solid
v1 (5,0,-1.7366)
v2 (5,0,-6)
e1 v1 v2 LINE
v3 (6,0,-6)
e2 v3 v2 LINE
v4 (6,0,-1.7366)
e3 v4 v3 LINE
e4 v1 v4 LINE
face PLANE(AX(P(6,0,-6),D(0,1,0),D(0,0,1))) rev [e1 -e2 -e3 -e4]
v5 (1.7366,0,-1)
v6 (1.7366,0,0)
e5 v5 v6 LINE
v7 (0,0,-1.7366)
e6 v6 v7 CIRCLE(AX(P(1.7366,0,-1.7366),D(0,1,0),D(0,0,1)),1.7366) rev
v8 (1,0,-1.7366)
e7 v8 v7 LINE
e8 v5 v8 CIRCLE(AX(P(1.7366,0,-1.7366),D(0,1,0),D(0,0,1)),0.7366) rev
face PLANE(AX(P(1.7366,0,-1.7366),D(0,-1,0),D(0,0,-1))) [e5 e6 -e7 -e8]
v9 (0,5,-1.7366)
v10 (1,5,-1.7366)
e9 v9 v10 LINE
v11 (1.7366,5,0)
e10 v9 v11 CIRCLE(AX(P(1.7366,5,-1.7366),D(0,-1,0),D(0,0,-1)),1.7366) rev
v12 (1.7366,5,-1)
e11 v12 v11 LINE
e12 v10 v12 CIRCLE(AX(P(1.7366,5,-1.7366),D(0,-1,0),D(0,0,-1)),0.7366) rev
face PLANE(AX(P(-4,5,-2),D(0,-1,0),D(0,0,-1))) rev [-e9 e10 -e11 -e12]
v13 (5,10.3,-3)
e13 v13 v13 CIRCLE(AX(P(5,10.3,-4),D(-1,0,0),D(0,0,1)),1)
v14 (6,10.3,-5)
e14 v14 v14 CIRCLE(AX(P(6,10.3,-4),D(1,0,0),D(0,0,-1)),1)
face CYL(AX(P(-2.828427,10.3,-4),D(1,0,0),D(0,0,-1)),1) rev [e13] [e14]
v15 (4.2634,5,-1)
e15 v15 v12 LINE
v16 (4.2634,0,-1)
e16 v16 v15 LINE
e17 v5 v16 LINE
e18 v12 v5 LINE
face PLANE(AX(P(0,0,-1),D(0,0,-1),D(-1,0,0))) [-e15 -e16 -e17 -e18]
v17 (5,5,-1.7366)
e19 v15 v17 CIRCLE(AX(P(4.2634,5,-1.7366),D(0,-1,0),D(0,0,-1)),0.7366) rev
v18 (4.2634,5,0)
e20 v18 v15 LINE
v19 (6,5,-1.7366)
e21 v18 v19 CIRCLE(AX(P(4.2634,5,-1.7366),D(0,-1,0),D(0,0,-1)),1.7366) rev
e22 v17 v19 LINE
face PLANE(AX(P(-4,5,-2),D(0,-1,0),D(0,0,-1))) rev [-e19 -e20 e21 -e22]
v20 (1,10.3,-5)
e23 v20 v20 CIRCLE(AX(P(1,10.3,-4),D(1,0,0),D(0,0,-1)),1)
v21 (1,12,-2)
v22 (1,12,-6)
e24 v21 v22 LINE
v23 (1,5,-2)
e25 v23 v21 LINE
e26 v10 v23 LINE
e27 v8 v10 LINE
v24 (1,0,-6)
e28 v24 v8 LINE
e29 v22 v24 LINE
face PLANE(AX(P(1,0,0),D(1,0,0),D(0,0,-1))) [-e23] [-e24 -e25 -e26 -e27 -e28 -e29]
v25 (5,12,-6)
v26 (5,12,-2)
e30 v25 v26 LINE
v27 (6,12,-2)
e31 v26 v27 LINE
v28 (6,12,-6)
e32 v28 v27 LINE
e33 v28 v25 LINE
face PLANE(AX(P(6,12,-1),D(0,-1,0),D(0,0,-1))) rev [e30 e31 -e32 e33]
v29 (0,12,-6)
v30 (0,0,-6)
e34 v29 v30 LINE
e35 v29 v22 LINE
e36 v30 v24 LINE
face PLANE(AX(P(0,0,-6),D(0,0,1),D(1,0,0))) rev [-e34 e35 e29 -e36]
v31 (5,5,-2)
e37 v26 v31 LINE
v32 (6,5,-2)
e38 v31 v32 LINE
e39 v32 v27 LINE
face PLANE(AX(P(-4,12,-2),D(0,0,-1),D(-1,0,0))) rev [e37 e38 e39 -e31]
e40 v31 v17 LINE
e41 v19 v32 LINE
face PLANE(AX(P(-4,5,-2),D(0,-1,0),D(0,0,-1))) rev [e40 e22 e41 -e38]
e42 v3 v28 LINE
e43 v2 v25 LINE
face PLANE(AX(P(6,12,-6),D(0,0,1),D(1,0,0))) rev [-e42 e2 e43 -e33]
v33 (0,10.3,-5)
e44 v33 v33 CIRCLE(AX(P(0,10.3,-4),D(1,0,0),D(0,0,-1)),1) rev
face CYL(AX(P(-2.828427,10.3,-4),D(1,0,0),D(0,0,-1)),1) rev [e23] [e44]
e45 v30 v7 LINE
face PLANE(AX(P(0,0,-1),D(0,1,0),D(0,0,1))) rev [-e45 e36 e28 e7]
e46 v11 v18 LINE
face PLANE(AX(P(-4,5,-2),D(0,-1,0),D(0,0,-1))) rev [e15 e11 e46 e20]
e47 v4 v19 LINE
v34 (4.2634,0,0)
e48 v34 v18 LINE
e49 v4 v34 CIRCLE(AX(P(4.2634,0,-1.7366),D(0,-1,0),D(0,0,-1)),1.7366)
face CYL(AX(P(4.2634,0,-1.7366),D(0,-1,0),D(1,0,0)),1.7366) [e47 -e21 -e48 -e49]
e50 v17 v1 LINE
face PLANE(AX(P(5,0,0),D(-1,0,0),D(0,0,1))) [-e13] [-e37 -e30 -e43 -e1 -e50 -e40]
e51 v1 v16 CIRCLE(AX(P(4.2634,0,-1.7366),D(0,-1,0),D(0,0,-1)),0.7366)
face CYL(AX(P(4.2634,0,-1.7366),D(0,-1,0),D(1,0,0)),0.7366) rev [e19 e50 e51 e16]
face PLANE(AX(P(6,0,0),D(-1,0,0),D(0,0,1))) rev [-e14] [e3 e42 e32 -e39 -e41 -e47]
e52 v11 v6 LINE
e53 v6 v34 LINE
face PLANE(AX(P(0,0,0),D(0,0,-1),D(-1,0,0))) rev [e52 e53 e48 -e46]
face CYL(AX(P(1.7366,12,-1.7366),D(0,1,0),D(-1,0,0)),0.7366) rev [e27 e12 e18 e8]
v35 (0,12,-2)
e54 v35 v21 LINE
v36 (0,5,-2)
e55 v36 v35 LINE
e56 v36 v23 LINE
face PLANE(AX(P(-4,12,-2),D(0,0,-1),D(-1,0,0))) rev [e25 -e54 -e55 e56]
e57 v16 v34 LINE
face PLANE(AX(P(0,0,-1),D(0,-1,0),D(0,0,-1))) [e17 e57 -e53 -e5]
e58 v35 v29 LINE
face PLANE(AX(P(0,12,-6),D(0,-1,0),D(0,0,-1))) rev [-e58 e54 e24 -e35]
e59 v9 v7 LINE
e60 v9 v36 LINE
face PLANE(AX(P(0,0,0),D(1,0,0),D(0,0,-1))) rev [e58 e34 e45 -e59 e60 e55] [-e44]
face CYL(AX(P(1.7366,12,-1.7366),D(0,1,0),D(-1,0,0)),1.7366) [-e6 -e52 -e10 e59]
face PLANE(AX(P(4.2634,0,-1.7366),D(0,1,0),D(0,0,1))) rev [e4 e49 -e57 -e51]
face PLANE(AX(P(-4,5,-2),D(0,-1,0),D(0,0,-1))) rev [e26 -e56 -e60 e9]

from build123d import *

# Parameters (mm, degrees)
CROQUIS2_W                         = 6
CROQUIS2_H                         = 12
BRIDA_BASE1_DEPTH                  = 1
BRIDA_DE_ARISTA1_STRIP_W           = 5.4732
BRIDA_DE_ARISTA1_STRIP_H           = 1
BRIDA_DE_ARISTA1_STRIP_CUT_DEPTH   = 12
BRIDA_DE_ARISTA1_STRIP_2_W         = 5.4732
BRIDA_DE_ARISTA1_STRIP_2_H         = 1
BRIDA_DE_ARISTA1_STRIP_CUT_2_DEPTH = 12
BRIDA_DE_ARISTA1_DEPTH             = 12
BRIDA_DE_ARISTA1_BEND_DEPTH        = 12
CROQUIS13_W                        = 2
CROQUIS13_H                        = 7
CORTAR_EXTRUIR1_DEPTH              = 10
CORTAR_EXTRUIR2_REACH              = 16.697
CROQUIS14_R                        = 1


# Sheet-metal steps are written as plain solids
with BuildPart() as part:
    # Croquis2 → Brida base1 (new body)
    with BuildSketch(Plane.XY):
        with Locations((3, 6)):
            Rectangle(CROQUIS2_W, CROQUIS2_H)
    extrude(amount=-BRIDA_BASE1_DEPTH)

    # Brida de arista1 strip (across the edge) → Brida de arista1 strip cut (cut)
    with BuildSketch(Plane(origin=(6, 12, -1), x_dir=(-1, 0, 0), z_dir=(0, -1, 0))):
        with Locations((-1, -0.5)):
            Rectangle(BRIDA_DE_ARISTA1_STRIP_W, BRIDA_DE_ARISTA1_STRIP_H)
    extrude(amount=BRIDA_DE_ARISTA1_STRIP_CUT_DEPTH, mode=Mode.SUBTRACT)

    # Brida de arista1 strip 2 (across the edge) → Brida de arista1 strip cut 2 (cut)
    with BuildSketch(Plane(origin=(0, 0, -1), x_dir=(1, 0, 0), z_dir=(0, 1, 0))):
        with Locations((-1, -0.5)):
            Rectangle(BRIDA_DE_ARISTA1_STRIP_2_W, BRIDA_DE_ARISTA1_STRIP_2_H)
    extrude(amount=BRIDA_DE_ARISTA1_STRIP_CUT_2_DEPTH, mode=Mode.SUBTRACT)

    # Brida de arista1 section (across the edge) → Brida de arista1 (add)
    with BuildSketch(Plane(origin=(6, 12, -1), x_dir=(-1, 0, 0), z_dir=(0, -1, 0))):
        with BuildLine():
            Line((0, 0.7366), (0, 5))
            Line((0, 5), (1, 5))
            Line((1, 5), (1, 0.7366))
            ThreePointArc((1, 0.7366), (1.215745145, 0.215745145), (1.7366, 0))
            Line((1.7366, 0), (1.7366, -1))
            ThreePointArc((1.7366, -1), (0.508638364, -0.491361636), (0, 0.7366))
        make_face()
    extrude(amount=BRIDA_DE_ARISTA1_DEPTH)

    # Brida de arista1 section 2 (across the edge) → Brida de arista1 bend (add)
    with BuildSketch(Plane(origin=(0, 0, -1), x_dir=(1, 0, 0), z_dir=(0, 1, 0))):
        with BuildLine():
            Line((0, 0.7366), (0, 5))
            Line((0, 5), (1, 5))
            Line((1, 5), (1, 0.7366))
            ThreePointArc((1, 0.7366), (1.215745145, 0.215745145), (1.7366, 0))
            Line((1.7366, 0), (1.7366, -1))
            ThreePointArc((1.7366, -1), (0.508638364, -0.491361636), (0, 0.7366))
        make_face()
    extrude(amount=BRIDA_DE_ARISTA1_BEND_DEPTH)

    # Croquis13 → Cortar-Extruir1 (cut)
    with BuildSketch(Plane(origin=(6, 0, 0), x_dir=(0, 0, -1), z_dir=(1, 0, 0))):
        with Locations((1, 8.5)):
            Rectangle(CROQUIS13_W, CROQUIS13_H)
    extrude(amount=-CORTAR_EXTRUIR1_DEPTH, mode=Mode.SUBTRACT)

    # Cortar-Extruir2: up to this face of the body (flat: up to its plane)
    cortar_extruir2_end = Plane(part.part.faces().sort_by_distance((0, 5.906533244, -3.943073405))[0])
    # Croquis14 → Cortar-Extruir2 (cut, up to the picked face)
    with BuildSketch(Plane(origin=(6, 0, 0), x_dir=(0, 0, -1), z_dir=(1, 0, 0)), mode=Mode.PRIVATE) as cortar_extruir2_sk1:
        with Locations((4, 10.3)):
            Circle(CROQUIS14_R)
    cortar_extruir2_tool1 = split(extrude(cortar_extruir2_sk1.sketch, amount=-CORTAR_EXTRUIR2_REACH, mode=Mode.PRIVATE), bisect_by=cortar_extruir2_end, keep=Keep.BOTH, mode=Mode.PRIVATE)
    add(cortar_extruir2_tool1.solids().sort_by(Axis((6, 10.3, -4), (-1, 0, 0)))[0], mode=Mode.SUBTRACT)


solid = part.part
